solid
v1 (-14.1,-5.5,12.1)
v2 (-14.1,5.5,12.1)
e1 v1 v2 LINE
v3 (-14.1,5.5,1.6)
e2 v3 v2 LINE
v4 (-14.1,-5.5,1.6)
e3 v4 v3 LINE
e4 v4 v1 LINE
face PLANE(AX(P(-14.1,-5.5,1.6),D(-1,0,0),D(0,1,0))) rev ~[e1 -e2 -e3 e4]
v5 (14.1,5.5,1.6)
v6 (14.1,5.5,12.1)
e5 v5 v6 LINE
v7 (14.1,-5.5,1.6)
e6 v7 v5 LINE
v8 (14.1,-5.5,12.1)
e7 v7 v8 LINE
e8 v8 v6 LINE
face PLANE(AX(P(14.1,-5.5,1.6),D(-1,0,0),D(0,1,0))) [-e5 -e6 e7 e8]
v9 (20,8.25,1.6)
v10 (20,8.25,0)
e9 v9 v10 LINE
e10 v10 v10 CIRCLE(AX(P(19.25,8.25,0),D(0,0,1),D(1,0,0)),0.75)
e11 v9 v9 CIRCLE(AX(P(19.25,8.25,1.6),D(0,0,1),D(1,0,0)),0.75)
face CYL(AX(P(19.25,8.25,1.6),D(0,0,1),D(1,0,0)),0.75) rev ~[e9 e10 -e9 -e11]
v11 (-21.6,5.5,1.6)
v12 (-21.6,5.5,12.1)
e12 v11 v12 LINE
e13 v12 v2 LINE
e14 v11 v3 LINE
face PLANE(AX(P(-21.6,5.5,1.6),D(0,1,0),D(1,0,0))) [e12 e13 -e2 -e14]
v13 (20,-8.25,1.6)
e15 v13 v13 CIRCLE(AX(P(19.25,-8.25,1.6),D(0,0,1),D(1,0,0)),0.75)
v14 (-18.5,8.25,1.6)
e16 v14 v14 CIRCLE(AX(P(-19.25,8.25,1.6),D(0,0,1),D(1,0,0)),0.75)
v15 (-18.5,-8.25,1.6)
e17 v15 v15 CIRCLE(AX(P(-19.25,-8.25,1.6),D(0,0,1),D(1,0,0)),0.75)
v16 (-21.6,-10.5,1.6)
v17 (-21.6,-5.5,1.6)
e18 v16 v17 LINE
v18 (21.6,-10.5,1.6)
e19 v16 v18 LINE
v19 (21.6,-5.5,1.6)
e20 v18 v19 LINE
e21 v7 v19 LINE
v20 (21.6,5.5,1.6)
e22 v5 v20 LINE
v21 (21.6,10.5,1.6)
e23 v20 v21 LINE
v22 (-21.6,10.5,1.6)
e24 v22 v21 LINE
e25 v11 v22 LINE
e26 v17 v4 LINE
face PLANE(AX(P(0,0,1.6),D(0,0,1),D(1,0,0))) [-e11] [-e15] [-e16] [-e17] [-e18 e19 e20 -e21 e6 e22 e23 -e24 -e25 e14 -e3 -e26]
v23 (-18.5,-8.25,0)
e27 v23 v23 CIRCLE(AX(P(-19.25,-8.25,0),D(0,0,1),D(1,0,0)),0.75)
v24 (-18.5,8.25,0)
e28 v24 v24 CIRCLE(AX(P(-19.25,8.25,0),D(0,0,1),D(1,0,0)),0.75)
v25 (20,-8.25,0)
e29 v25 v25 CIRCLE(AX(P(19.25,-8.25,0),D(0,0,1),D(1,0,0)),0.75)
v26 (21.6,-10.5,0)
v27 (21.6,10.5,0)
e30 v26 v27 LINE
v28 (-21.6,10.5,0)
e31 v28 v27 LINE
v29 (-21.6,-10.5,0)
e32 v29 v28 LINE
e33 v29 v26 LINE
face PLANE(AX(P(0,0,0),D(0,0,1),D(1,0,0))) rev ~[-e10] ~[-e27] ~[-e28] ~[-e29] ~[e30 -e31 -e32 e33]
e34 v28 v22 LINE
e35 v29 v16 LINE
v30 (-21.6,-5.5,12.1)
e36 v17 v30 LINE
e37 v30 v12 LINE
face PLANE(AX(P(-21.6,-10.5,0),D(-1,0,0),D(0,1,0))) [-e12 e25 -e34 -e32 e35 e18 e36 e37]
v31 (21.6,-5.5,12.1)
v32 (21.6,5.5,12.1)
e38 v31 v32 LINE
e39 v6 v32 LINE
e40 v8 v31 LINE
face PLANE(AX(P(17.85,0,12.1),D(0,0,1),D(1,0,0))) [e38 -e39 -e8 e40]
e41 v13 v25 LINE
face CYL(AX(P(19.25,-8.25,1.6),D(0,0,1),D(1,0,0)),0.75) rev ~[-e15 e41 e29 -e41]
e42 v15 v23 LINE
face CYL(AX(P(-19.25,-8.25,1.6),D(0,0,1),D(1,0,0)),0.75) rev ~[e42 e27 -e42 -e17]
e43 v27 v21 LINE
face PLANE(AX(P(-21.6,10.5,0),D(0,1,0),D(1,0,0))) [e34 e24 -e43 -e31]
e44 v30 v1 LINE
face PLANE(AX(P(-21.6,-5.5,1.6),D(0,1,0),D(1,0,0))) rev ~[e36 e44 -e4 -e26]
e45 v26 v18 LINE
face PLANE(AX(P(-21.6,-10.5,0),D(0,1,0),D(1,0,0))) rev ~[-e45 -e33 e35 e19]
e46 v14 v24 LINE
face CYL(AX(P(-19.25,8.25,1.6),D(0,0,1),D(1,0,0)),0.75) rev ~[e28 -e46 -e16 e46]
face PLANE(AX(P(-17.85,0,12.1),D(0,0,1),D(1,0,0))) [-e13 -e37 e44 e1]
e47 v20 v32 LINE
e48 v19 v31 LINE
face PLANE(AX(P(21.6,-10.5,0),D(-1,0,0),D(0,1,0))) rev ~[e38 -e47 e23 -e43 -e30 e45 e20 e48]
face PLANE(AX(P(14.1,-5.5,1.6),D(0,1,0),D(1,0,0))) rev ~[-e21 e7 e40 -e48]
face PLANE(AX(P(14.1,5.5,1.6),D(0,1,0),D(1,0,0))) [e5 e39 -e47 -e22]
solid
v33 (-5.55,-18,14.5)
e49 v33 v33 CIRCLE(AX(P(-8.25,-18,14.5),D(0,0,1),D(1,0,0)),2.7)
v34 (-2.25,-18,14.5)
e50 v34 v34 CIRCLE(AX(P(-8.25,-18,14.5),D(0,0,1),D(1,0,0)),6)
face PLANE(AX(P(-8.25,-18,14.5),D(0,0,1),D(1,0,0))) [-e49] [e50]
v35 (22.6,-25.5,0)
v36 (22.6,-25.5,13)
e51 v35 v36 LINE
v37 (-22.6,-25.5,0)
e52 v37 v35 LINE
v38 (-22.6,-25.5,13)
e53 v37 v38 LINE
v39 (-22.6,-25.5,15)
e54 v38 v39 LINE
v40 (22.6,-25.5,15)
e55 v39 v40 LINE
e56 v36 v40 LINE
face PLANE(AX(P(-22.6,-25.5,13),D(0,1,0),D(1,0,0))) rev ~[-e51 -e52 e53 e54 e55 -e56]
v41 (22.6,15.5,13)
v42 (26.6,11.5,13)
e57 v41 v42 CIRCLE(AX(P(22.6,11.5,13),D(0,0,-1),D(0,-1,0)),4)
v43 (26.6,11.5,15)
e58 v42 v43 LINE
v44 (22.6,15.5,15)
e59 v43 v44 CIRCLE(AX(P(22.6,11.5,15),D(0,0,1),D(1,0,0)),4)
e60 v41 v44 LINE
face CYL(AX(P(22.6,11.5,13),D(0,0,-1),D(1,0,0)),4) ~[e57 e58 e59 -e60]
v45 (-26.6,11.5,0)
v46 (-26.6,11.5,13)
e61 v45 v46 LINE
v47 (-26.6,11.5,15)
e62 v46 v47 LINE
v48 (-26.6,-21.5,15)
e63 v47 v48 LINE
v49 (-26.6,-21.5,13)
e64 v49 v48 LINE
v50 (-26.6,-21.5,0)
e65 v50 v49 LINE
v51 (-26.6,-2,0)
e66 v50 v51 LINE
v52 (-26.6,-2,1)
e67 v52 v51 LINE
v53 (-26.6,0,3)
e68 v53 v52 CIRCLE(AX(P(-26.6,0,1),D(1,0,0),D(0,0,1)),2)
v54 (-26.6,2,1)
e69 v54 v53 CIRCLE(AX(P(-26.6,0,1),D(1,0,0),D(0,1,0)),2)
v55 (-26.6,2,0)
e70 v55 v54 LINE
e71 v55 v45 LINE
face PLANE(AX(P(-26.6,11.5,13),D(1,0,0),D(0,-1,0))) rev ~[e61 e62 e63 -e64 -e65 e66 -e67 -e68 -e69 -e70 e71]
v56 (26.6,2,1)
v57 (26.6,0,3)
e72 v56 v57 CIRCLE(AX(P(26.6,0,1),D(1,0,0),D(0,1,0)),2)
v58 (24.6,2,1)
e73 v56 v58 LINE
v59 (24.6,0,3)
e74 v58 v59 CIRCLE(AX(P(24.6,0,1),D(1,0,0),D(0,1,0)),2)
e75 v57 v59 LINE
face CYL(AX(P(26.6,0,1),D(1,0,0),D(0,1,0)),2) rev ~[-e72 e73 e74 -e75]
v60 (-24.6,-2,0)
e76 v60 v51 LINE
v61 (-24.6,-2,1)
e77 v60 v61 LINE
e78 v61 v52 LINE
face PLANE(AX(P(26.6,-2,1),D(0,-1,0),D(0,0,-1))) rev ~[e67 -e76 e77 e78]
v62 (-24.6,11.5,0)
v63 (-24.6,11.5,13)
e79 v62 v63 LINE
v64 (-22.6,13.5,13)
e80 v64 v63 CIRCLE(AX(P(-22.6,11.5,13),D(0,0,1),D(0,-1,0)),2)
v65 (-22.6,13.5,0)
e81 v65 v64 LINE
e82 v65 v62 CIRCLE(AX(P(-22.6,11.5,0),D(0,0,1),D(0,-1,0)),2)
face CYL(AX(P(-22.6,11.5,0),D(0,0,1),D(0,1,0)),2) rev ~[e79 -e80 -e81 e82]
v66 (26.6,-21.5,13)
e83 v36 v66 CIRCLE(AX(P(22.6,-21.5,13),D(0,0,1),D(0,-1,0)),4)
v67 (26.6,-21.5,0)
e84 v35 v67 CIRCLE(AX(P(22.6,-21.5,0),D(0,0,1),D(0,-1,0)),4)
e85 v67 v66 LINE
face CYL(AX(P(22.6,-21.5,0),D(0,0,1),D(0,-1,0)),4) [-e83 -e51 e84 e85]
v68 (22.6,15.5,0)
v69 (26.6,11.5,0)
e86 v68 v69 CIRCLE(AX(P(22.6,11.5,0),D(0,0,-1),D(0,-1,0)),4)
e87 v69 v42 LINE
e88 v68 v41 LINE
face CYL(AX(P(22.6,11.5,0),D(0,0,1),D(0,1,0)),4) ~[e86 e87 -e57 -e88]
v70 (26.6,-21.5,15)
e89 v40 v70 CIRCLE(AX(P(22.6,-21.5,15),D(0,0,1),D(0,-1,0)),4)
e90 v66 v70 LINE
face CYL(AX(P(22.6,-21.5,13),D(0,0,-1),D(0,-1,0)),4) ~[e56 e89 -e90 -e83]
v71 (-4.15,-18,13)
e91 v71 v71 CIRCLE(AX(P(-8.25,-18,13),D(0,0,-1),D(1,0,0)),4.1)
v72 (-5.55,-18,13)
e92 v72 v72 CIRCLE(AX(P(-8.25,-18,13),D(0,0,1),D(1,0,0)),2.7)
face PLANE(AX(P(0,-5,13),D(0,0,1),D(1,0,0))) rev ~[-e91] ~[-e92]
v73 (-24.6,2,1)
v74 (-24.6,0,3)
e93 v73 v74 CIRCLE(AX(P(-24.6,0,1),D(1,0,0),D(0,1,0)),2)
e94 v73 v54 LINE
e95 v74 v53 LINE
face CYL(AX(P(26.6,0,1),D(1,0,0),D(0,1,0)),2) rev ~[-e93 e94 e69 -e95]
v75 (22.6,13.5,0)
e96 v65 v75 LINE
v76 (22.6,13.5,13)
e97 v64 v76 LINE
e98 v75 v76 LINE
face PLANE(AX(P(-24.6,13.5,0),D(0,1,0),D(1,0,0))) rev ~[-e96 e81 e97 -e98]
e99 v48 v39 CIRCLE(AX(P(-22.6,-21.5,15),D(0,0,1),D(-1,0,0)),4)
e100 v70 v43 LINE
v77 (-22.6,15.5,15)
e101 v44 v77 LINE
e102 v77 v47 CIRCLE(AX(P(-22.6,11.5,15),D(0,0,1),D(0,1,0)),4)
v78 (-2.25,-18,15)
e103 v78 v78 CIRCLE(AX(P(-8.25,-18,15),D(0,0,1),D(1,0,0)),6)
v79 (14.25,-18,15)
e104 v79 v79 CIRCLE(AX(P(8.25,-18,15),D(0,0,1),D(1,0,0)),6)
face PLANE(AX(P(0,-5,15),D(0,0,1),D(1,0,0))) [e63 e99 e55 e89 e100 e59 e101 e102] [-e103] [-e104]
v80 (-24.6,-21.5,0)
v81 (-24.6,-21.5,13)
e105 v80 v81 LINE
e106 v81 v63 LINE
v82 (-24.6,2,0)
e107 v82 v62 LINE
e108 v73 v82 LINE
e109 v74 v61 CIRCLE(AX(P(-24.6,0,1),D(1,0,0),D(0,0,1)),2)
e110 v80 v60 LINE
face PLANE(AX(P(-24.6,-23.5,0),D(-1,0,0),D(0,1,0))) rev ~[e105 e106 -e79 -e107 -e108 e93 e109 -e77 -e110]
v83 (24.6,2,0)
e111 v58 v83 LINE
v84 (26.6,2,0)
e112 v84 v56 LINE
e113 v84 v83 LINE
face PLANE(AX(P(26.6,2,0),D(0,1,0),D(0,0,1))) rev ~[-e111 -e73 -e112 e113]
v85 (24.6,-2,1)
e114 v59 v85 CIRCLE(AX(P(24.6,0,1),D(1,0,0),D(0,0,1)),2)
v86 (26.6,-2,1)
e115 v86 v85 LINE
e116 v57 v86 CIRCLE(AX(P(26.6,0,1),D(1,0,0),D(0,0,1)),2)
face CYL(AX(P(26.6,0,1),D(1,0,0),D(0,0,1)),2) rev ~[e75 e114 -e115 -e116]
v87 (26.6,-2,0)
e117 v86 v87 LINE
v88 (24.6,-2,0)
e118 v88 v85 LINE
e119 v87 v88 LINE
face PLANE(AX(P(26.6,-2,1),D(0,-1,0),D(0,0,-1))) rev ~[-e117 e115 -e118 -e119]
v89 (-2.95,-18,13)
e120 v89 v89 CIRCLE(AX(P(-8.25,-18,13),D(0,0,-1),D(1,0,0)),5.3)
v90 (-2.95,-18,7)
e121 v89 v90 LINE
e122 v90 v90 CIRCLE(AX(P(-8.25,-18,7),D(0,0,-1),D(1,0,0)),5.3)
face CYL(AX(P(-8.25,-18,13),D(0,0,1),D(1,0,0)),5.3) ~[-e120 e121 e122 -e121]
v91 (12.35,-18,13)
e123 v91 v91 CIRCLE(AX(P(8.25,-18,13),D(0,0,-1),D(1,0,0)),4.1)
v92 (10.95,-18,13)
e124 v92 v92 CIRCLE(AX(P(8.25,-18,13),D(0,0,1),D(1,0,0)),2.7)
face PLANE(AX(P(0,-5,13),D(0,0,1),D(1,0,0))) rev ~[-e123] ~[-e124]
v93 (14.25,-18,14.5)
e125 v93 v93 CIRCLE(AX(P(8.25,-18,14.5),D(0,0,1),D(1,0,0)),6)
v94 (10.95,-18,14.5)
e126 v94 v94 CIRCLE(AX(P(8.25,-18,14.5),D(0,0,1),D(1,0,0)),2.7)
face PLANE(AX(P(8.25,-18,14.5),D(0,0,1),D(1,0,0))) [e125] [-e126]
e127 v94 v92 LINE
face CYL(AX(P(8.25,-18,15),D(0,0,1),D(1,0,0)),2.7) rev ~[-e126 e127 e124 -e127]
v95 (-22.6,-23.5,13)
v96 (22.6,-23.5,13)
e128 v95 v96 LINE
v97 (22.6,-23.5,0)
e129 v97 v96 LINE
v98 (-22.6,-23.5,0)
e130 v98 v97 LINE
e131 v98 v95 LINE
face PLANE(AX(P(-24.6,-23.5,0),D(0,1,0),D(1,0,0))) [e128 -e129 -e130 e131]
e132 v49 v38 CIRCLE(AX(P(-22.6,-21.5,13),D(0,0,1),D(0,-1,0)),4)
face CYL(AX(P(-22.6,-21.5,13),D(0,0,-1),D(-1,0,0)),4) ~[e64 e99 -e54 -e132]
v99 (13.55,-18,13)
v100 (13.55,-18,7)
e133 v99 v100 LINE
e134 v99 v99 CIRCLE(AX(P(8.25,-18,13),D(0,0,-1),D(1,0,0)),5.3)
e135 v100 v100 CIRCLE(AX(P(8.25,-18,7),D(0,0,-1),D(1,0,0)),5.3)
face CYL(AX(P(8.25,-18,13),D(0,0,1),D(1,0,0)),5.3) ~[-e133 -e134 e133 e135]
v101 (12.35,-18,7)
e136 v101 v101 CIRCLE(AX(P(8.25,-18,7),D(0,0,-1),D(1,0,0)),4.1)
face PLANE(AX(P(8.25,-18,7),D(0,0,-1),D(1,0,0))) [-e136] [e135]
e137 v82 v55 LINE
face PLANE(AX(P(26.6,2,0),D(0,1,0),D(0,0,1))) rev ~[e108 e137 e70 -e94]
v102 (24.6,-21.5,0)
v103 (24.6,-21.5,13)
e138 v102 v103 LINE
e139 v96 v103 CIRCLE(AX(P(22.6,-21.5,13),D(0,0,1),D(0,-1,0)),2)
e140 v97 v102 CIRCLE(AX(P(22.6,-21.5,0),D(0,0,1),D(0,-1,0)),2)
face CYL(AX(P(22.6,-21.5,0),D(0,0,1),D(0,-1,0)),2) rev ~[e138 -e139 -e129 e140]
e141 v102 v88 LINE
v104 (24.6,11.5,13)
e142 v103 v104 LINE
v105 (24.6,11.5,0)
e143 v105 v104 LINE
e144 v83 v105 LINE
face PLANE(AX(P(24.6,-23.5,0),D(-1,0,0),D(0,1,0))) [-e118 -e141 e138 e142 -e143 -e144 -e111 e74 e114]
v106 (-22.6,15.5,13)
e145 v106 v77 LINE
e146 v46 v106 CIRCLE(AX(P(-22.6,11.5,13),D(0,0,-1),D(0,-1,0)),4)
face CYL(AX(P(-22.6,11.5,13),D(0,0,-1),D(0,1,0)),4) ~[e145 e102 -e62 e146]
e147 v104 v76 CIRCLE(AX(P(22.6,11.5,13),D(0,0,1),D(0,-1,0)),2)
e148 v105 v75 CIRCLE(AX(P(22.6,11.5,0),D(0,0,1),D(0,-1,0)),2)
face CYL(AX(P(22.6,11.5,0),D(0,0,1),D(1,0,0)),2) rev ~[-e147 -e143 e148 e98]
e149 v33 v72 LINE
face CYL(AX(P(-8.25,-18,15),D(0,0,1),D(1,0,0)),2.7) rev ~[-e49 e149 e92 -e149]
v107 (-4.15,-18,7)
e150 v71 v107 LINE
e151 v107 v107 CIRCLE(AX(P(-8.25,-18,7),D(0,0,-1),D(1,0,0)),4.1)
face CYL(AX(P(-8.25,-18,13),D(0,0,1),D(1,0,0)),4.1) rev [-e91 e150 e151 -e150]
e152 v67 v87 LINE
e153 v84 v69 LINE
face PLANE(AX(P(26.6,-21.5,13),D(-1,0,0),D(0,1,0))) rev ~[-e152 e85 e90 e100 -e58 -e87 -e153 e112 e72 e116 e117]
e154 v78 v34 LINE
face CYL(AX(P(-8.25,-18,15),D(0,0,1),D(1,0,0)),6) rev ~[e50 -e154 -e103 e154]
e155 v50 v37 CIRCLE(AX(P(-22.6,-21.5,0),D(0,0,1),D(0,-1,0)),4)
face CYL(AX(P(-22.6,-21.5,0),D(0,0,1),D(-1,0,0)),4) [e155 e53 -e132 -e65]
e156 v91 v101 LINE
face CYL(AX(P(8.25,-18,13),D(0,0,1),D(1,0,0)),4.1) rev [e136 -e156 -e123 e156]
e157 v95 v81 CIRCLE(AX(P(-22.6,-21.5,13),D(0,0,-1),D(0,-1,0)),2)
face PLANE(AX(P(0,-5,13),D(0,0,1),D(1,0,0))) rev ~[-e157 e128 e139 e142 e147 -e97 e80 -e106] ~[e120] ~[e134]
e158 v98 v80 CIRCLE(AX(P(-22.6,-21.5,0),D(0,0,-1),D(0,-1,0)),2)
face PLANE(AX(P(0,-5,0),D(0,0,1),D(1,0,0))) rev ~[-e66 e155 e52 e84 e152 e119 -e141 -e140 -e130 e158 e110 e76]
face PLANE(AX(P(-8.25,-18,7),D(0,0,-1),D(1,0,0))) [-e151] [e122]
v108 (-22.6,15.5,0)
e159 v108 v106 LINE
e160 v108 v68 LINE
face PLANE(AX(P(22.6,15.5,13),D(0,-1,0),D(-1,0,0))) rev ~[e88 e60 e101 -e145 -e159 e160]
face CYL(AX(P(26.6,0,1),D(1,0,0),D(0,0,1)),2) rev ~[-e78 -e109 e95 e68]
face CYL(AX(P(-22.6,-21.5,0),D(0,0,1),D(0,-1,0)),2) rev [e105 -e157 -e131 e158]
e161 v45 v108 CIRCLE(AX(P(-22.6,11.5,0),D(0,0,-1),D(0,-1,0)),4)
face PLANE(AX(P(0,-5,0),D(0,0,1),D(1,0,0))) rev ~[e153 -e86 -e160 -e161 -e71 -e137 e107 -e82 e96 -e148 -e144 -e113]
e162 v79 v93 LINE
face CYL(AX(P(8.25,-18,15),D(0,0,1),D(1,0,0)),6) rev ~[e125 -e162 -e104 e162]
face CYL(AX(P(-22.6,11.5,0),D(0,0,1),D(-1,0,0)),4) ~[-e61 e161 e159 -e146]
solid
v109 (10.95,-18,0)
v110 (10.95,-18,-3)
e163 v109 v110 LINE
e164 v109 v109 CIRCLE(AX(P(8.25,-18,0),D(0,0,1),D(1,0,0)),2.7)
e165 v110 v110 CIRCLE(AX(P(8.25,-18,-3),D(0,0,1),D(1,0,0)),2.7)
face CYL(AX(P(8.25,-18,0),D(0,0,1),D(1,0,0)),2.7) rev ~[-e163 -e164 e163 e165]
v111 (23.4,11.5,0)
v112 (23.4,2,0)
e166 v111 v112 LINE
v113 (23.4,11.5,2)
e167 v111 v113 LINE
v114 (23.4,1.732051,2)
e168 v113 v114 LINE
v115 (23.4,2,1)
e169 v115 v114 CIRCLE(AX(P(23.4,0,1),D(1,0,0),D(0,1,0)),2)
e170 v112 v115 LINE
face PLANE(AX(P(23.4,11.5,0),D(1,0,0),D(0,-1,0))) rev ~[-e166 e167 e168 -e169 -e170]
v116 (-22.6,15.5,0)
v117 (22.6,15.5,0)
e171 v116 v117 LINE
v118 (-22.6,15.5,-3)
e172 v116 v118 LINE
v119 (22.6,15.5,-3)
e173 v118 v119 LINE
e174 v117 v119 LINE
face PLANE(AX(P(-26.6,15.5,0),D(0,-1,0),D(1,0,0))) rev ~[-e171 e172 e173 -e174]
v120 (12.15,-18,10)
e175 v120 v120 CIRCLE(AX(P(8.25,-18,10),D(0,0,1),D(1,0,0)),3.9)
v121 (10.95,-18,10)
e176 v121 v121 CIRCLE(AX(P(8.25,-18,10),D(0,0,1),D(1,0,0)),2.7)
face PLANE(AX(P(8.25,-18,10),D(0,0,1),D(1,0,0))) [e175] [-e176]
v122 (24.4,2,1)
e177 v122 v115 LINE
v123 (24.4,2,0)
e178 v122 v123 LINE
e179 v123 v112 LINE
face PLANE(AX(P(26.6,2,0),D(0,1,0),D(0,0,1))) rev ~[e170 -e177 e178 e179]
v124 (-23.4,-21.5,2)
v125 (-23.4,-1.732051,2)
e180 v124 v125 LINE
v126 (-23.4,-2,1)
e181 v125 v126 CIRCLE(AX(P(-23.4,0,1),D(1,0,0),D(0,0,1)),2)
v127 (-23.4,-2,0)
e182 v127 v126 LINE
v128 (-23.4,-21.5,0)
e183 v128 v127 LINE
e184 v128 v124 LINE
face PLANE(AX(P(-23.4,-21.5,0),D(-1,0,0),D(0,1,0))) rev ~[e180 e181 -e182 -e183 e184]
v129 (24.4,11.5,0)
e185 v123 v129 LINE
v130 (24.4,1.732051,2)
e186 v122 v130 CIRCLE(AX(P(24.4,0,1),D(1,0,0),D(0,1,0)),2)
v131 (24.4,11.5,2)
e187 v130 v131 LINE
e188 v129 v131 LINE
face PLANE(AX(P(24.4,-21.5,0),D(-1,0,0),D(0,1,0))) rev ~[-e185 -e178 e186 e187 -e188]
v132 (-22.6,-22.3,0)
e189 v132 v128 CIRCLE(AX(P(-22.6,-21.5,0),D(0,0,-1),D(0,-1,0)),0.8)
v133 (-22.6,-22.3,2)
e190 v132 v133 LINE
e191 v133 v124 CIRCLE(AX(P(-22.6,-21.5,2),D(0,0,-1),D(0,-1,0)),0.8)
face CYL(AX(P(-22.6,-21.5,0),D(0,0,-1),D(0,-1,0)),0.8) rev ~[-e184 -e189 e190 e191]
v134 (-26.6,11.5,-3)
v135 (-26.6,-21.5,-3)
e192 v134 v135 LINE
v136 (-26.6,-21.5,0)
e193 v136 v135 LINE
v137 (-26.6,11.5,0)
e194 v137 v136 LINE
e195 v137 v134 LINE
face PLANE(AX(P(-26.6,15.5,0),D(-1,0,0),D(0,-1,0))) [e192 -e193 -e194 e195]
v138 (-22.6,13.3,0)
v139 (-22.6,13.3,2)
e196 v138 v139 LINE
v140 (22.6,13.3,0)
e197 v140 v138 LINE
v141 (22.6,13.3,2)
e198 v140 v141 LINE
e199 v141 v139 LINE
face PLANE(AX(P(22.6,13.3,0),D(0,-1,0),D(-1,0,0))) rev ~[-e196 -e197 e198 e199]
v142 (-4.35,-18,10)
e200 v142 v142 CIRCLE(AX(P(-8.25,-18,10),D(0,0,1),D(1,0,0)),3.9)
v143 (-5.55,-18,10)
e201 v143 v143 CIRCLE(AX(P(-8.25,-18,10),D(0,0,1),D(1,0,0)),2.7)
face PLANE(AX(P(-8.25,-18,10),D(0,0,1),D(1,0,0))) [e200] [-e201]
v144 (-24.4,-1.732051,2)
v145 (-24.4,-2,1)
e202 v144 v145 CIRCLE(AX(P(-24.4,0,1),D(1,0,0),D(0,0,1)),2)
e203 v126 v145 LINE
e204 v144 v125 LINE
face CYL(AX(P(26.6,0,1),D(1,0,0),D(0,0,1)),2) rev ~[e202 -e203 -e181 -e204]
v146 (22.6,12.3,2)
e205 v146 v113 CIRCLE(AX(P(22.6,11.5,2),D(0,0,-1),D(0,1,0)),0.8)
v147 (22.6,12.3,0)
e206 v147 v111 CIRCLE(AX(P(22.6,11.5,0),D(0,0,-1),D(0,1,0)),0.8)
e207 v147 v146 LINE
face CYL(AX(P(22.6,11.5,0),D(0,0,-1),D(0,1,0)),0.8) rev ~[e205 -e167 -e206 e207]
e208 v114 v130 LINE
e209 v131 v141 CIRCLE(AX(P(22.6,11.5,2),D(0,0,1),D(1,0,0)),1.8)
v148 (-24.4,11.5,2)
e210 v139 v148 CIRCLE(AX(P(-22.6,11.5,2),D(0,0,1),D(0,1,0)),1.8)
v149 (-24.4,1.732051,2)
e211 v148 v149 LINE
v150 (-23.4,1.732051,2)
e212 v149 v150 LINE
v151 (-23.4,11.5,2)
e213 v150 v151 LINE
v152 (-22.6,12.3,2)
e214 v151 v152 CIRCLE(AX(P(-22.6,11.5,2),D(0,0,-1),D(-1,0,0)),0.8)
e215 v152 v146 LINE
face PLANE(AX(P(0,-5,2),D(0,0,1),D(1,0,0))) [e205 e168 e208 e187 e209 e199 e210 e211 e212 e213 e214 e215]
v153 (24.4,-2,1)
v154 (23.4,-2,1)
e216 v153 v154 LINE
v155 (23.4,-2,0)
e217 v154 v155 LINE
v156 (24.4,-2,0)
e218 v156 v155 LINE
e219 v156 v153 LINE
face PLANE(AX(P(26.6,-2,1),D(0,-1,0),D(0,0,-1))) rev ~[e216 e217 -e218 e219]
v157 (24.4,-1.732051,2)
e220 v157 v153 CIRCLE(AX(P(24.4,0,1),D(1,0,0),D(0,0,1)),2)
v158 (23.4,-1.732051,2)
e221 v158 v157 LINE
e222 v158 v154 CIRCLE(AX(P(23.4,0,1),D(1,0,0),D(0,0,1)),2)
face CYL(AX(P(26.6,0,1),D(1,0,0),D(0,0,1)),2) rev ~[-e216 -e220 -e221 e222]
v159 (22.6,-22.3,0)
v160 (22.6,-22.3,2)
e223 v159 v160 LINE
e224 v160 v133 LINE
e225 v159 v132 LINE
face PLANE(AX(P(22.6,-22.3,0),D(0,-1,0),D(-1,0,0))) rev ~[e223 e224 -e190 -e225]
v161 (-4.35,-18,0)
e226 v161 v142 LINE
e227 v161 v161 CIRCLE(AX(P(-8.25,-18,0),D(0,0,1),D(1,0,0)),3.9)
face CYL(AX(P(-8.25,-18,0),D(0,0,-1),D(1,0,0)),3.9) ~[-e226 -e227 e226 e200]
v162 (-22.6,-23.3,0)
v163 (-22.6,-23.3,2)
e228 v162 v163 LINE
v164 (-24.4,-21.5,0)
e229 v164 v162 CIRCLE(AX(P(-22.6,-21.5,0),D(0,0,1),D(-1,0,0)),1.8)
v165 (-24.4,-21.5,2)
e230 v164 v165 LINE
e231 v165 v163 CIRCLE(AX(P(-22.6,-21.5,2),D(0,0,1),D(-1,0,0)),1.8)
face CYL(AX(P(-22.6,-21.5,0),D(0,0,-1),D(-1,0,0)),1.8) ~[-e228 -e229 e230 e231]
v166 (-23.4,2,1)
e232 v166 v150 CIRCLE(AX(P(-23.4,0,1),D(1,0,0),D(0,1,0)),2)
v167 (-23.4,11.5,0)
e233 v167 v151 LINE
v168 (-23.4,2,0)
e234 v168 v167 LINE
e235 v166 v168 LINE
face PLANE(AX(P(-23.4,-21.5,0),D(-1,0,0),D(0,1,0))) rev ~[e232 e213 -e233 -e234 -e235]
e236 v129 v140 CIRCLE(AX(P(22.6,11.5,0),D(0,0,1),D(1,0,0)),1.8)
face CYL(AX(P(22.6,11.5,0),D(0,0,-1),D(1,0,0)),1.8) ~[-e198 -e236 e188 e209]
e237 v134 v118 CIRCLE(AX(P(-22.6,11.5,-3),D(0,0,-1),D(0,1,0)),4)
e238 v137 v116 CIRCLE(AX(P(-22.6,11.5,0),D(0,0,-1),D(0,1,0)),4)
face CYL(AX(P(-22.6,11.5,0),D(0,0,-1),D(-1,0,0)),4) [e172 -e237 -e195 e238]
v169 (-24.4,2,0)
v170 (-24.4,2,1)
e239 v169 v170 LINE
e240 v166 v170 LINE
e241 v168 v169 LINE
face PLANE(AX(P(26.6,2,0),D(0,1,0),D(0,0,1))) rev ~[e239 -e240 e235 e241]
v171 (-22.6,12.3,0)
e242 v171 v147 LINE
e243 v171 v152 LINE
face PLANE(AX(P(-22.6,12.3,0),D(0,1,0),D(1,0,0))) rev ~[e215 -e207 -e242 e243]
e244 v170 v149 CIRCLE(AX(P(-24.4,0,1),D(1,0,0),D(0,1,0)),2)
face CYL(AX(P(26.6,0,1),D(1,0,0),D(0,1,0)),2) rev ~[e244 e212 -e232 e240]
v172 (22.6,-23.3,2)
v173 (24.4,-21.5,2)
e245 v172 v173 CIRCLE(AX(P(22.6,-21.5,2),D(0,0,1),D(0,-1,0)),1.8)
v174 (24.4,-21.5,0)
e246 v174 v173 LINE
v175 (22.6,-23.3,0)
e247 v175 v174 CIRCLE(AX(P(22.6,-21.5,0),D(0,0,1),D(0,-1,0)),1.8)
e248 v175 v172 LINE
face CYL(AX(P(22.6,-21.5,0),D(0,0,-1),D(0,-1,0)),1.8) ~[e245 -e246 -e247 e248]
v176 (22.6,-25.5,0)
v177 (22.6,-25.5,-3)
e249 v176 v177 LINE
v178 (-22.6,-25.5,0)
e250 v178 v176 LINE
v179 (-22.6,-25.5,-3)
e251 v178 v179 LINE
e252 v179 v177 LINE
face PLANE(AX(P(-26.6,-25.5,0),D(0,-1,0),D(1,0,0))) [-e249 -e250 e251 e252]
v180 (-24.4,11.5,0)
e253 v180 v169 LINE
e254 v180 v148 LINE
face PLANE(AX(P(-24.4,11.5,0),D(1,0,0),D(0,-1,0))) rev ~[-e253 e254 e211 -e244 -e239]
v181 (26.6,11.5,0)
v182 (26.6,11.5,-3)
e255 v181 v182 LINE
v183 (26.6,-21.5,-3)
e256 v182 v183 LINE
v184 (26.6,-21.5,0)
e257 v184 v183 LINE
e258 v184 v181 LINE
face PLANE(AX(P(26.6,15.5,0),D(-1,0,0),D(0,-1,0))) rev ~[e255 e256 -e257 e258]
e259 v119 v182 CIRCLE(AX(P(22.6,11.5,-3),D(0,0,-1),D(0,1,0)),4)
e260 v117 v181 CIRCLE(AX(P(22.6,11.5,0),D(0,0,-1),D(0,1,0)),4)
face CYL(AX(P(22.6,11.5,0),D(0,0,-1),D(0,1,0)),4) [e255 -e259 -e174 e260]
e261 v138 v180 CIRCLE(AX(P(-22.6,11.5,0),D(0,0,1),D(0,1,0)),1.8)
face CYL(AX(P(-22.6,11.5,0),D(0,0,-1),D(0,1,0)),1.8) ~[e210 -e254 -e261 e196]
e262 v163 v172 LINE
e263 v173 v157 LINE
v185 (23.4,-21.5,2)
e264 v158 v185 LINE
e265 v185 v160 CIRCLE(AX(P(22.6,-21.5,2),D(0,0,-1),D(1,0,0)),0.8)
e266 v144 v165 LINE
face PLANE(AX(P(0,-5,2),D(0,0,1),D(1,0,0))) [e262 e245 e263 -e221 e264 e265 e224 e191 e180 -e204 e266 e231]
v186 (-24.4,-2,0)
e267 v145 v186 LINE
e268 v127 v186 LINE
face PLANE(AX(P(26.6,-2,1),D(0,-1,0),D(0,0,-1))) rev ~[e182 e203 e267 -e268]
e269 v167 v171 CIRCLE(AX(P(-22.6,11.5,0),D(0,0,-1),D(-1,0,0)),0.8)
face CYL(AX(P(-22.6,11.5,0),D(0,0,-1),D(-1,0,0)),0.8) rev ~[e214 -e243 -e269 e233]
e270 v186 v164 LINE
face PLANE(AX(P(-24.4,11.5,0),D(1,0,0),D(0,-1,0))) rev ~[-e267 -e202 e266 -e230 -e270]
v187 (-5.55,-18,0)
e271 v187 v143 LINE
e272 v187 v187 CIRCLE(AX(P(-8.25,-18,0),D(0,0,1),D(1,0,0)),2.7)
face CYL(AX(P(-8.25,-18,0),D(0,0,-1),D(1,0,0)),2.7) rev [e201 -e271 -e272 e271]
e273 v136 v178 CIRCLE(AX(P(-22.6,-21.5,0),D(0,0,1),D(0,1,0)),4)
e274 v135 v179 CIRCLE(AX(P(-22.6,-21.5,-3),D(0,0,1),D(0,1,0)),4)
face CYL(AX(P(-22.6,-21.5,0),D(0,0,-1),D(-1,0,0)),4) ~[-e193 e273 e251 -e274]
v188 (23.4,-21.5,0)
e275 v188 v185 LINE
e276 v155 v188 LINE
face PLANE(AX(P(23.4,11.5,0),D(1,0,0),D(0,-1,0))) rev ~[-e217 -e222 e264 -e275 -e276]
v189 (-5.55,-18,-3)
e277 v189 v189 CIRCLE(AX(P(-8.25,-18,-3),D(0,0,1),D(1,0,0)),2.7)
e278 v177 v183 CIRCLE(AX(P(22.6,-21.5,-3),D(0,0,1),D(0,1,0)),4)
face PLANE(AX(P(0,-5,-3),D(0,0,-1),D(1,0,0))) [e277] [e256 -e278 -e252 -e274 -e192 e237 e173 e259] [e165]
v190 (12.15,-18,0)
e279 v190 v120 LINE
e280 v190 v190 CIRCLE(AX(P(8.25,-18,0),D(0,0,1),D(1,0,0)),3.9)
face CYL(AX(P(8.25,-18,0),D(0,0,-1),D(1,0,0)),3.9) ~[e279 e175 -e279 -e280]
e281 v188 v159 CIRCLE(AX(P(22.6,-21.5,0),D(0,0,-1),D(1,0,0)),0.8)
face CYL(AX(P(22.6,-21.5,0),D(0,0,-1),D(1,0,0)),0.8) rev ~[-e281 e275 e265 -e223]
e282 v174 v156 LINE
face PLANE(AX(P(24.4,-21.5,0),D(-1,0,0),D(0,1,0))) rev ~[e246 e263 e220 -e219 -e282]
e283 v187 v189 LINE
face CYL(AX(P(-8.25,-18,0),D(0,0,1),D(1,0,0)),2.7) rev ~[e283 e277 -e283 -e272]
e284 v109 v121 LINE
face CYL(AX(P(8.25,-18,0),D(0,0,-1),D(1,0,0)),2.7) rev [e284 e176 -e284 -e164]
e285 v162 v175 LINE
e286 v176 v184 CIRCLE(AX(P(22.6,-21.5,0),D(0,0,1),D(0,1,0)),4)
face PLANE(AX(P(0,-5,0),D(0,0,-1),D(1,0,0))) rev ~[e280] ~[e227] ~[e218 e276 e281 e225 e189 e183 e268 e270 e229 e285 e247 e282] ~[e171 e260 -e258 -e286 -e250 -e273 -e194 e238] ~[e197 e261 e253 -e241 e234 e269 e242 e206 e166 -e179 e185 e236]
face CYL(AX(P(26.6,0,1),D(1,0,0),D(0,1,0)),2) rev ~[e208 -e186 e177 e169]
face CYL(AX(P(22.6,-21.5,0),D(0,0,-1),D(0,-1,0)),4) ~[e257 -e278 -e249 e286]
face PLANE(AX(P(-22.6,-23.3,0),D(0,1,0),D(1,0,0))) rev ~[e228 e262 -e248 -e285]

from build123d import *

# Parameters (mm, degrees)
F0_W      = 43.2
F0_H      = 21
F1_DEPTH  = 1.6
F2_R      = 0.75
F3_DEPTH  = 25
F4_W      = 7.5
F4_H      = 11
F5_DEPTH  = 10.5
F6_W      = 53.2
F6_H      = 41
F7_DEPTH  = 3
F8_R      = 2.7
F9_DEPTH  = 25
F10_W     = 53.2
F10_H     = 41
F10_W_2   = 49.2
F10_H_2   = 37
F11_DEPTH = 13
F12_R     = 2
F13_R     = 4
F13_2_R   = 4
F15_DEPTH = 2
F17_DEPTH = 2
F18_R     = 3.9
F18_R_2   = 2.7
F19_DEPTH = 10
F20_R     = 2.7
F21_DEPTH = 25
F22_R     = 5.3
F22_R_2   = 4.1
F23_DEPTH = 6
F25_DEPTH = 63.4
F26_R     = 6
F27_DEPTH = 0.5


with BuildPart() as f1:
    # F0 (on Top) → F1 (new body)
    with BuildSketch(Plane.XY):
        Rectangle(F0_W, F0_H)
    extrude(amount=F1_DEPTH)

    # F2 (on face) → F3 (cut)
    with BuildSketch(Plane.XY.offset(1.6)):
        with Locations((-19.25, 8.25)):
            Circle(F2_R)
        with Locations((-19.25, -8.25)):
            Circle(F2_R)
        with Locations((19.25, 8.25)):
            Circle(F2_R)
        with Locations((19.25, -8.25)):
            Circle(F2_R)
    extrude(amount=-F3_DEPTH, mode=Mode.SUBTRACT)

    # F4 (on face) → F5 (join)
    with BuildSketch(Plane.XY.offset(1.6)):
        with Locations((17.85, 0)):
            Rectangle(F4_W, F4_H)
        with Locations((-17.85, 0)):
            Rectangle(F4_W, F4_H)
    extrude(amount=F5_DEPTH)


with BuildPart() as f7:
    # F6 (on face) → F7 (new body)
    with BuildSketch(Plane(origin=(0, 0, 0), x_dir=(1, 0, 0), z_dir=(0, 0, -1))):
        with Locations((0, 5)):
            Rectangle(F6_W, F6_H)
    extrude(amount=F7_DEPTH)

    # F8 (on face) → F9 (cut)
    with BuildSketch(Plane.XY):
        with Locations((-8.25, -18)):
            Circle(F8_R)
        with Locations((8.25, -18)):
            Circle(F8_R)
    extrude(amount=-F9_DEPTH, mode=Mode.SUBTRACT)

    # F13
    f13_edges = [f7.edges().sort_by_distance(p)[0] for p in [
        (26.6, 15.5, -1.5),
        (-26.6, 15.5, -1.5),
        (-26.6, -25.5, -1.5),
        (26.6, -25.5, -1.5),
    ]]
    fillet(f13_edges, radius=F13_R)

    # F16 (on face) → F17 (join)
    with BuildSketch(Plane.XY):
        with BuildLine():
            Line((22.6, 13.3), (-22.6, 13.3))
            ThreePointArc((-22.6, 13.3), (-23.8727922061, 12.7727922061), (-24.4, 11.5))
            Line((-24.4, 11.5), (-24.4, -21.5))
            ThreePointArc((-24.4, -21.5), (-23.8727922061, -22.7727922061), (-22.6, -23.3))
            Line((-22.6, -23.3), (22.6, -23.3))
            ThreePointArc((22.6, -23.3), (23.8727922061, -22.7727922061), (24.4, -21.5))
            Line((24.4, -21.5), (24.4, 11.5))
            ThreePointArc((24.4, 11.5), (23.8727922061, 12.7727922061), (22.6, 13.3))
        make_face()
        with BuildLine():
            ThreePointArc((-23.4, 11.5), (-23.1656854249, 12.0656854249), (-22.6, 12.3))
            Line((-22.6, 12.3), (22.6, 12.3))
            ThreePointArc((22.6, 12.3), (23.1656854249, 12.0656854249), (23.4, 11.5))
            Line((23.4, 11.5), (23.4, -21.5))
            ThreePointArc((23.4, -21.5), (23.1656854249, -22.0656854249), (22.6, -22.3))
            Line((22.6, -22.3), (-22.6, -22.3))
            ThreePointArc((-22.6, -22.3), (-23.1656854249, -22.0656854249), (-23.4, -21.5))
            Line((-23.4, -21.5), (-23.4, 11.5))
        make_face(mode=Mode.SUBTRACT)
    extrude(amount=F17_DEPTH)

    # F18 (on face) → F19 (join)
    with BuildSketch(Plane.XY):
        with Locations((-8.25, -18)):
            Circle(F18_R)
        with Locations((-8.25, -18)):
            Circle(F18_R_2, mode=Mode.SUBTRACT)
        with Locations((8.25, -18)):
            Circle(F18_R)
        with Locations((8.25, -18)):
            Circle(F18_R_2, mode=Mode.SUBTRACT)
    extrude(amount=F19_DEPTH)


with BuildPart() as f11:
    # F10 (on face) → F11 (new body)
    with BuildSketch(Plane.XY):
        with Locations((0, -5)):
            Rectangle(F10_W, F10_H)
        with Locations((0, -5)):
            Rectangle(F10_W_2, F10_H_2, mode=Mode.SUBTRACT)
    extrude(amount=F11_DEPTH)

    # F12
    f12_edges = [f11.edges().sort_by_distance(p)[0] for p in [
        (24.6, 13.5, 6.5),
        (24.6, -23.5, 6.5),
        (-24.6, -23.5, 6.5),
        (-24.6, 13.5, 6.5),
    ]]
    fillet(f12_edges, radius=F12_R)

    # F13#2
    f13_2_edges = [f11.edges().sort_by_distance(p)[0] for p in [
        (26.6, 15.5, 6.5),
        (-26.6, 15.5, 6.5),
        (-26.6, -25.5, 6.5),
        (26.6, -25.5, 6.5),
    ]]
    fillet(f13_2_edges, radius=F13_2_R)

    # F14 (on face) → F15 (join)
    with BuildSketch(Plane.XY.offset(13)):
        with BuildLine():
            Line((-26.6, 11.5), (-26.6, -21.5))
            ThreePointArc((-26.6, -21.5), (-25.4284271247, -24.3284271247), (-22.6, -25.5))
            Line((-22.6, -25.5), (22.6, -25.5))
            ThreePointArc((22.6, -25.5), (25.4284271247, -24.3284271247), (26.6, -21.5))
            Line((26.6, -21.5), (26.6, 11.5))
            ThreePointArc((26.6, 11.5), (25.4284271247, 14.3284271247), (22.6, 15.5))
            Line((22.6, 15.5), (-22.6, 15.5))
            ThreePointArc((-22.6, 15.5), (-25.4284271247, 14.3284271247), (-26.6, 11.5))
        make_face()
    extrude(amount=F15_DEPTH)

    # F20 (on face) → F21 (cut)
    with BuildSketch(Plane.XY.offset(15)):
        with Locations((-8.25, -18)):
            Circle(F20_R)
        with Locations((8.25, -18)):
            Circle(F20_R)
    extrude(amount=-F21_DEPTH, mode=Mode.SUBTRACT)

    # F22 (on face) → F23 (join)
    with BuildSketch(Plane(origin=(0, 0, 13), x_dir=(1, 0, 0), z_dir=(0, 0, -1))):
        with Locations((-8.25, 18)):
            Circle(F22_R)
        with Locations((-8.25, 18)):
            Circle(F22_R_2, mode=Mode.SUBTRACT)
        with Locations((8.25, 18)):
            Circle(F22_R)
        with Locations((8.25, 18)):
            Circle(F22_R_2, mode=Mode.SUBTRACT)
    extrude(amount=F23_DEPTH)


with BuildPart() as f25_tool:
    # F24 (on face) → F25 (new body)
    with BuildSketch(Plane.YZ.offset(26.6)):
        with BuildLine():
            Line((-2, 1), (-2, 0))
            Line((-2, 0), (2, 0))
            Line((2, 0), (2, 1))
            ThreePointArc((2, 1), (1.4142135624, 2.4142135624), (0, 3))
            ThreePointArc((0, 3), (-1.4142135624, 2.4142135624), (-2, 1))
        make_face()
    extrude(amount=-F25_DEPTH)


with BuildPart() as f7_1:
    add(f7.part)

    # F25: cut by f25_tool
    add(f25_tool.part, mode=Mode.SUBTRACT)


with BuildPart() as f11_1:
    add(f11.part)

    # F25: cut by f25_tool
    add(f25_tool.part, mode=Mode.SUBTRACT)

    # F26 (on face) → F27 (cut)
    with BuildSketch(Plane.XY.offset(15)):
        with Locations((-8.25, -18)):
            Circle(F26_R)
        with Locations((8.25, -18)):
            Circle(F26_R)
    extrude(amount=-F27_DEPTH, mode=Mode.SUBTRACT)


solid = Compound([f1.part, f7_1.part, f11_1.part])
